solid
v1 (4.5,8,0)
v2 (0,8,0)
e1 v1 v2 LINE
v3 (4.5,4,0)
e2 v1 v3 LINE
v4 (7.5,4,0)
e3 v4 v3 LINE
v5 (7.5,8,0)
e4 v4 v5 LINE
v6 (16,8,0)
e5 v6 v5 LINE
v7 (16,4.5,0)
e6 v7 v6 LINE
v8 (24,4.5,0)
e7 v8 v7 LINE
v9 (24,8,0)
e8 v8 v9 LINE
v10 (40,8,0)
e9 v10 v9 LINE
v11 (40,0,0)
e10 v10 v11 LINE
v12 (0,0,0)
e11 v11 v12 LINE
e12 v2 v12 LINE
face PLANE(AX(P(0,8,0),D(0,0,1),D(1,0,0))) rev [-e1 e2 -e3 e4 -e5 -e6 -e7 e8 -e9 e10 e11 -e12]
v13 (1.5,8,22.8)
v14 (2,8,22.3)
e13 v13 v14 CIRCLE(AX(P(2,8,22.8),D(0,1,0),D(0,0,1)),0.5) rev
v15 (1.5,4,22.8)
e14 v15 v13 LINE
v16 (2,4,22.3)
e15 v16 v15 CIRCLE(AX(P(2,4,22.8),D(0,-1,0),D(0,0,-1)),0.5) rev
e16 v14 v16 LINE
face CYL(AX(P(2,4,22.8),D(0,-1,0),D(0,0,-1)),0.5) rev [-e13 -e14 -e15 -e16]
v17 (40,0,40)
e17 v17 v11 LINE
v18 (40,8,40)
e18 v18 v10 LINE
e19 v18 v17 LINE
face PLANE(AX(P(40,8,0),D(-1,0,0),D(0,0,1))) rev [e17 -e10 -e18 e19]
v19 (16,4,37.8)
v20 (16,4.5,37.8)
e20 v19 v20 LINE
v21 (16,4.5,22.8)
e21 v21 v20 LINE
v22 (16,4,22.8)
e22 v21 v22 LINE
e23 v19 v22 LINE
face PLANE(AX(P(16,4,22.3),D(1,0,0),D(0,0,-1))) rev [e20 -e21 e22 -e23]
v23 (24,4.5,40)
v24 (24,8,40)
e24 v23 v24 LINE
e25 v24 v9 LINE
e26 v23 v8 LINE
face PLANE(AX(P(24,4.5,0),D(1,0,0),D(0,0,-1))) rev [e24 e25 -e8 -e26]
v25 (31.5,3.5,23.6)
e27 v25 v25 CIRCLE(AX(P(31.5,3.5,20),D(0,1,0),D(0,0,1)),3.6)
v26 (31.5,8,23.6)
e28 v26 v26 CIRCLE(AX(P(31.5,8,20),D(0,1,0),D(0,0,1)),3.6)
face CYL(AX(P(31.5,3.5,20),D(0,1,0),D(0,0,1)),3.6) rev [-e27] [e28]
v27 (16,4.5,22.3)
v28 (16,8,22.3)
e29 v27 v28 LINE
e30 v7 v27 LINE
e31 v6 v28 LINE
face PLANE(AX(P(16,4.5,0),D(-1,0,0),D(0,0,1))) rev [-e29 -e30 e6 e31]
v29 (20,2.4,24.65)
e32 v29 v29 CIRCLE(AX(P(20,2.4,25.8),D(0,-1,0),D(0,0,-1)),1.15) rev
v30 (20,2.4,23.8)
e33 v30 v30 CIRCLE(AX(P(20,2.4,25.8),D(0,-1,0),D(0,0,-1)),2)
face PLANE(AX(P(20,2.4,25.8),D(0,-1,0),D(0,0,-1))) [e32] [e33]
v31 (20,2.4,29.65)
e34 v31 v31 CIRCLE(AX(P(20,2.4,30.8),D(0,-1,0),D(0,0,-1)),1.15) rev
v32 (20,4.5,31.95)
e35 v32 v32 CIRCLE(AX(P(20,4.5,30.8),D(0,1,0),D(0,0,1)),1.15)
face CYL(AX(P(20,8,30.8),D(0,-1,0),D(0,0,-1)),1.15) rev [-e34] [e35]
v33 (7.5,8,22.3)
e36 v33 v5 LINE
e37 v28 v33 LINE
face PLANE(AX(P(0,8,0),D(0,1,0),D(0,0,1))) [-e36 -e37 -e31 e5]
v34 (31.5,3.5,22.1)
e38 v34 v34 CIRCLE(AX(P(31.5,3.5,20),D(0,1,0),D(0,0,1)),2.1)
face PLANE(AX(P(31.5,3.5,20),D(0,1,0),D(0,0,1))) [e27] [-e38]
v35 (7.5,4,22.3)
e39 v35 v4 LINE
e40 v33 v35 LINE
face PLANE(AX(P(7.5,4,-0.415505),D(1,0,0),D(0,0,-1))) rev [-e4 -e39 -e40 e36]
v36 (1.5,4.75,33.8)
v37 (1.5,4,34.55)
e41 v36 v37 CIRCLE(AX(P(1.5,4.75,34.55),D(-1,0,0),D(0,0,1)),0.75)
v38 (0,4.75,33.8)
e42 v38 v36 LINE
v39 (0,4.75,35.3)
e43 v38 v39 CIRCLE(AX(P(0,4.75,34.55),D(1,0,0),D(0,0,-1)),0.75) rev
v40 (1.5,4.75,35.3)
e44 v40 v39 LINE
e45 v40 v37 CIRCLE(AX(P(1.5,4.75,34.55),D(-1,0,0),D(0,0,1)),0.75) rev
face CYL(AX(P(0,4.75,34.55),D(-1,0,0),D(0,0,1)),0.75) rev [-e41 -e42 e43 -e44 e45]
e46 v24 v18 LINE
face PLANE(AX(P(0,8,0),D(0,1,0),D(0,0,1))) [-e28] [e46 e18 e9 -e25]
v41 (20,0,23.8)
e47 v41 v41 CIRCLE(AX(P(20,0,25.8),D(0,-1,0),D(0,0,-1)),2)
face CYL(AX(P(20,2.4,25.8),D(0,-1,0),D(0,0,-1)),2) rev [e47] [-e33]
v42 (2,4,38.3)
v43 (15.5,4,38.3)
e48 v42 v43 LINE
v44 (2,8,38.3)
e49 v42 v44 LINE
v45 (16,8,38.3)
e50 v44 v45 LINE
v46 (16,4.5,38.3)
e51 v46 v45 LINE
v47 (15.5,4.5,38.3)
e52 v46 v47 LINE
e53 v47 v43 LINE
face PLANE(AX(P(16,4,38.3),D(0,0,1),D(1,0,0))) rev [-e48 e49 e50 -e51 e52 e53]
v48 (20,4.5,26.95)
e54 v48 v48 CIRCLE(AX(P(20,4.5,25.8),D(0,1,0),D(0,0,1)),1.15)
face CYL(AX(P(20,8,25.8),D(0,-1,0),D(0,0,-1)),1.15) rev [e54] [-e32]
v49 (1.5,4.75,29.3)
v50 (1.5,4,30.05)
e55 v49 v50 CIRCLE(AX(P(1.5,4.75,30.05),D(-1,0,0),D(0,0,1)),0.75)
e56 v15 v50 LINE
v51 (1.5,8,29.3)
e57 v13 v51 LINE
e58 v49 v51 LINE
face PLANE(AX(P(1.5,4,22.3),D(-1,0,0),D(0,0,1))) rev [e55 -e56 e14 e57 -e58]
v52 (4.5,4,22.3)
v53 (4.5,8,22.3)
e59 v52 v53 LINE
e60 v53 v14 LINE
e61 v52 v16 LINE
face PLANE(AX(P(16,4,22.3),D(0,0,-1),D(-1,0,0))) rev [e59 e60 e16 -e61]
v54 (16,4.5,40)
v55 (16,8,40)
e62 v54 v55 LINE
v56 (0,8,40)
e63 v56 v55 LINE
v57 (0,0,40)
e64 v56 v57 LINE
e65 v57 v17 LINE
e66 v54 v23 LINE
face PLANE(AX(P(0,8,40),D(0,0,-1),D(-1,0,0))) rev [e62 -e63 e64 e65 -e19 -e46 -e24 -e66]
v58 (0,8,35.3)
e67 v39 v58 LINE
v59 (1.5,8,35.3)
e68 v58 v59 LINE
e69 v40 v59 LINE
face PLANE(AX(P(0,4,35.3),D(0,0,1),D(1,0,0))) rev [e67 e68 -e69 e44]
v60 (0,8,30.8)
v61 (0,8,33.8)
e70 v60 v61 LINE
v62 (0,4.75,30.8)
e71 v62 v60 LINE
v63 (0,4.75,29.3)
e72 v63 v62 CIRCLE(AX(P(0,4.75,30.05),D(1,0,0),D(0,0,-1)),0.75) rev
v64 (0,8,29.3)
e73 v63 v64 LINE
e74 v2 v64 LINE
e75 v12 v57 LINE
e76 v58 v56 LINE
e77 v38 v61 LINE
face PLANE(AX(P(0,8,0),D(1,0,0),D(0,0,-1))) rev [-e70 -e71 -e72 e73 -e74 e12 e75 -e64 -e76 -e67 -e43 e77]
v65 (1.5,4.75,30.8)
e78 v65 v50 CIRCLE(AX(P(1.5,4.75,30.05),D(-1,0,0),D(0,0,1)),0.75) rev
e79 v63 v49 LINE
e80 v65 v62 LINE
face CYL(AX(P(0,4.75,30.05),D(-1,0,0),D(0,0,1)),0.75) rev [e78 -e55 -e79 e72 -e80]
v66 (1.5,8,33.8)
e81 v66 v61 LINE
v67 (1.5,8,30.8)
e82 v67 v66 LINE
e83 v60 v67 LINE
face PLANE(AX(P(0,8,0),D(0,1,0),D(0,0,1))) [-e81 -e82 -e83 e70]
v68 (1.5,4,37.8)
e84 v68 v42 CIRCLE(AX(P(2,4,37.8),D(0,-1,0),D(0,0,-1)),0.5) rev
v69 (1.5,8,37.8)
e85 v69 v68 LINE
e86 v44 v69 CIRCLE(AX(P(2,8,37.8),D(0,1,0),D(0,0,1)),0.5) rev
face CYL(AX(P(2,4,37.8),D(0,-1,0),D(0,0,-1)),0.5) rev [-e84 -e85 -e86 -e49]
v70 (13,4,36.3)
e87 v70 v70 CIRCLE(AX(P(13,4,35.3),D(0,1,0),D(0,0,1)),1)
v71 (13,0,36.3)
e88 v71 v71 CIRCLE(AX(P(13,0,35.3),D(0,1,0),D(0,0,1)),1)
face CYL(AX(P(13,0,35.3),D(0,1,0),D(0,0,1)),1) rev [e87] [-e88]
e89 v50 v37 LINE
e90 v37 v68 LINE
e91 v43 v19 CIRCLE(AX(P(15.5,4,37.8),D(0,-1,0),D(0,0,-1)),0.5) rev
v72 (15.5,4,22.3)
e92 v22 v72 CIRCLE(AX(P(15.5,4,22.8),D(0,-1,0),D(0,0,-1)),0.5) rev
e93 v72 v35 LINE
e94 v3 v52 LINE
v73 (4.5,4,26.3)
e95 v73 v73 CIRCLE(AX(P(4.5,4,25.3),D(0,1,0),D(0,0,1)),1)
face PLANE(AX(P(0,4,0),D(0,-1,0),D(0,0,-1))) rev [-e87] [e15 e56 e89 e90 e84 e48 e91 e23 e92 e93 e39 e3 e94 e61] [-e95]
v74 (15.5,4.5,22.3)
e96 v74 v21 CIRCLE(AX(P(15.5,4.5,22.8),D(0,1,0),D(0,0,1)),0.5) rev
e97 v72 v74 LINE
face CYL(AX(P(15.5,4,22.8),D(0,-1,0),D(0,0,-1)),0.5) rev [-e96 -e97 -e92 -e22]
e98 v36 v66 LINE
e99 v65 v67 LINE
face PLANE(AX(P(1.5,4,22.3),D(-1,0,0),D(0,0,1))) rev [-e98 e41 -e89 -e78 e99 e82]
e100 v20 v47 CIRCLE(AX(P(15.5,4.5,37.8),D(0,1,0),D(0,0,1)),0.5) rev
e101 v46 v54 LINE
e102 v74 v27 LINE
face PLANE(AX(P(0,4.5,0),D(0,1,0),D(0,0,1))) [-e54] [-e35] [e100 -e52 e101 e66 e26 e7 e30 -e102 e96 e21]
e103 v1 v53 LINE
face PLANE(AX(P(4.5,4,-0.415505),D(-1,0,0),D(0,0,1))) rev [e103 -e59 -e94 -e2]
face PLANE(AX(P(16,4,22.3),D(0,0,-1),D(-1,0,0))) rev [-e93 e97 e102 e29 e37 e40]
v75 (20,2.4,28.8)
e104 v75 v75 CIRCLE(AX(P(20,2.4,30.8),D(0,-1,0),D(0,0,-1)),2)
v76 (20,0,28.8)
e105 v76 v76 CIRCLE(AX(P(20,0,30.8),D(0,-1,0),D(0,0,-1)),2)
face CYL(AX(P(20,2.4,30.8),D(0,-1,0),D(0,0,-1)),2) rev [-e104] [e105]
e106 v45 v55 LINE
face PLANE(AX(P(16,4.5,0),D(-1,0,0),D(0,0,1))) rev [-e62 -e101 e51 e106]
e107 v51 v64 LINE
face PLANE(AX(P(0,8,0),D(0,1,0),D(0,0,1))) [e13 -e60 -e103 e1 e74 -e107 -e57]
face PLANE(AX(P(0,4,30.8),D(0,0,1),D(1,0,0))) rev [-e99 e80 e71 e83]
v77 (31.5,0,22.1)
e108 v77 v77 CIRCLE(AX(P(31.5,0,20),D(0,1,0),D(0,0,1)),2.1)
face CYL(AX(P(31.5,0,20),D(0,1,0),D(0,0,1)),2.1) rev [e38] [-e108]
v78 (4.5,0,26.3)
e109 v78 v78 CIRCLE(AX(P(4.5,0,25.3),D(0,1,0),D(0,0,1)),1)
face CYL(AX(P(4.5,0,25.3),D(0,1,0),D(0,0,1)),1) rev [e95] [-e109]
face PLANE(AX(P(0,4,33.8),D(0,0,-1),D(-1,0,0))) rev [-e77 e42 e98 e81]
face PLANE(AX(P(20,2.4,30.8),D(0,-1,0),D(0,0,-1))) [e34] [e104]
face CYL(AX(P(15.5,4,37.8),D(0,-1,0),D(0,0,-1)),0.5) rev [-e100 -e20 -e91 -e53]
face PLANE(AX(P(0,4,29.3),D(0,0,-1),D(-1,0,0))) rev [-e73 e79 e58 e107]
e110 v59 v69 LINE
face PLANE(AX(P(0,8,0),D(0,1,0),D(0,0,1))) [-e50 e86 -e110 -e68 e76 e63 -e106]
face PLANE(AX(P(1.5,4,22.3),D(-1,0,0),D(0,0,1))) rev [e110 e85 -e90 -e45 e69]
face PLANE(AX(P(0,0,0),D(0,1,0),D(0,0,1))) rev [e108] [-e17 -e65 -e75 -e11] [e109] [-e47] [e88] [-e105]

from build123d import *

# Parameters (mm, degrees)
SKETCH_1_W           = 40
SKETCH_1_H           = 40
EXTRUDE_1_DEPTH      = 8
SKETCH_2_W           = 8
SKETCH_2_H           = 40
CUT_EXTRUDE_1_DEPTH  = 3.5
SKETCH_3_R           = 1.15
CUT_EXTRUDE_2_DEPTH  = 58.131427428
SKETCH_4_R           = 2
CUT_EXTRUDE_3_DEPTH  = 2.4
SKETCH_5_W           = 14.5
SKETCH_5_H           = 16
CUT_EXTRUDE_4_DEPTH  = 4
FILLET_2_R           = 0.5
SKETCH_6_W           = 1.5
SKETCH_6_H           = 1.5
CUT_EXTRUDE_5_DEPTH  = 4
SKETCH_7_R           = 1
CUT_EXTRUDE_6_DEPTH  = 4
FILLET_3_R           = 0.75
FILLET_4_R           = 0.75
CUT_EXTRUDE_7_DEPTH  = 4
SKETCH_10_R          = 3.6
CUT_EXTRUDE_9_DEPTH  = 4.5
SKETCH_11_R          = 2.1
CUT_EXTRUDE_10_DEPTH = 57.747246629


with BuildPart() as part:
    # 草图1 → 凸台-拉伸1 (new body)
    with BuildSketch(Plane(origin=(0, 0, 0), x_dir=(1, 0, 0), z_dir=(0, 1, 0))):
        with Locations((20, -20)):
            Rectangle(SKETCH_1_W, SKETCH_1_H)
    extrude(amount=EXTRUDE_1_DEPTH)

    # 草图2 → 切除-拉伸1 (cut)
    with BuildSketch(Plane(origin=(0, 8, 0), x_dir=(1, 0, 0), z_dir=(0, 1, 0))):
        with Locations((20, -20)):
            Rectangle(SKETCH_2_W, SKETCH_2_H)
    extrude(amount=-CUT_EXTRUDE_1_DEPTH, mode=Mode.SUBTRACT)

    # 草图3 → 切除-拉伸2 (cut, through all)
    with BuildSketch(Plane(origin=(0, 0, 0), x_dir=(-1, 0, 0), z_dir=(0, -1, 0))):
        with Locations(Location((-20, -30.8, 0), (0, 0, 90))):
            Circle(SKETCH_3_R)
        with Locations(Location((-20, -25.8, 0), (0, 0, 90))):
            Circle(SKETCH_3_R)
    extrude(amount=-CUT_EXTRUDE_2_DEPTH, mode=Mode.SUBTRACT)

    # 草图4 → 切除-拉伸3 (cut)
    with BuildSketch(Plane(origin=(0, 0, 0), x_dir=(-1, 0, 0), z_dir=(0, -1, 0))):
        with Locations(Location((-20, -30.8, 0), (0, 0, 90))):
            Circle(SKETCH_4_R)
        with Locations(Location((-20, -25.8, 0), (0, 0, 90))):
            Circle(SKETCH_4_R)
    extrude(amount=-CUT_EXTRUDE_3_DEPTH, mode=Mode.SUBTRACT)

    # 草图5 → 切除-拉伸4 (cut)
    with BuildSketch(Plane(origin=(0, 8, 0), x_dir=(1, 0, 0), z_dir=(0, 1, 0))):
        with Locations((8.75, -30.3)):
            Rectangle(SKETCH_5_W, SKETCH_5_H)
    extrude(amount=-CUT_EXTRUDE_4_DEPTH, mode=Mode.SUBTRACT)

    # 圆角2
    fillet_2_edges = [part.edges().sort_by_distance(p)[0] for p in [
        (16, 4.25, 22.3),
        (16, 4.25, 38.3),
        (1.5, 6, 38.3),
        (1.5, 6, 22.3),
    ]]
    fillet(fillet_2_edges, radius=FILLET_2_R)

    # 草图6 → 切除-拉伸5 (cut)
    with BuildSketch(Plane(origin=(0, 8, 0), x_dir=(1, 0, 0), z_dir=(0, 1, 0))):
        with Locations((0.75, -34.55)):
            Rectangle(SKETCH_6_W, SKETCH_6_H)
        with Locations((0.75, -30.05)):
            Rectangle(SKETCH_6_W, SKETCH_6_H)
    extrude(amount=-CUT_EXTRUDE_5_DEPTH, mode=Mode.SUBTRACT)

    # 草图7 → 切除-拉伸6 (cut)
    with BuildSketch(Plane(origin=(0, 4, 0), x_dir=(1, 0, 0), z_dir=(0, 1, 0))):
        with Locations(Location((4.5, -25.3, 0), (0, 0, 270))):
            Circle(SKETCH_7_R)
        with Locations(Location((13, -35.3, 0), (0, 0, 270))):
            Circle(SKETCH_7_R)
    extrude(amount=-CUT_EXTRUDE_6_DEPTH, mode=Mode.SUBTRACT)

    # 圆角3
    # the kernel refuses this fillet: 0.75 mm, written as the material it adds along each edge
    with BuildSketch(Plane(origin=(0, 4, 29.3), x_dir=(0, 0, 1), z_dir=(1, 0, 0)), Plane(origin=(1.5, 4, 30.8), x_dir=(0, 0, -1), z_dir=(-1, 0, 0))) as fillet_3_piece_1:
        with BuildLine():
            CenterArc((FILLET_3_R, -FILLET_3_R), FILLET_3_R, 90, 90)
            Line((0, -FILLET_3_R), (0, 0))
            Line((0, 0), (FILLET_3_R, 0))
        make_face()
    extrude(amount=1.5)

    # 圆角4
    # the kernel refuses this fillet: 0.75 mm, written as the material it adds along each edge
    with BuildSketch(Plane(origin=(0, 4, 33.8), x_dir=(0, 0, 1), z_dir=(1, 0, 0)), Plane(origin=(1.5, 4, 35.3), x_dir=(0, 0, -1), z_dir=(-1, 0, 0))) as fillet_4_piece_1:
        with BuildLine():
            CenterArc((FILLET_4_R, -FILLET_4_R), FILLET_4_R, 90, 90)
            Line((0, -FILLET_4_R), (0, 0))
            Line((0, 0), (FILLET_4_R, 0))
        make_face()
    extrude(amount=1.5)

    # 草图8 → 切除-拉伸7 (cut)
    with BuildSketch(Plane(origin=(0, 8, 0), x_dir=(1, 0, 0), z_dir=(0, 1, 0))):
        with BuildLine():
            Line((7.5, 0.415504674), (7.5, -29.155940237))
            ThreePointArc((7.5, -29.155940237), (6, -30.655940237), (4.5, -29.155940237))
            Line((4.5, -29.155940237), (4.5, 0.415504674))
            ThreePointArc((4.5, 0.415504674), (6, 1.915504674), (7.5, 0.415504674))
        make_face()
    extrude(amount=-CUT_EXTRUDE_7_DEPTH, mode=Mode.SUBTRACT)

    # 草图10 → 切除-拉伸9 (cut)
    with BuildSketch(Plane(origin=(0, 8, 0), x_dir=(1, 0, 0), z_dir=(0, 1, 0))):
        with Locations(Location((31.5, -20, 0), (0, 0, 270))):
            Circle(SKETCH_10_R)
    extrude(amount=-CUT_EXTRUDE_9_DEPTH, mode=Mode.SUBTRACT)

    # 草图11 → 切除-拉伸10 (cut, through all)
    with BuildSketch(Plane(origin=(0, 3.5, 0), x_dir=(1, 0, 0), z_dir=(0, 1, 0))):
        with Locations(Location((31.5, -20, 0), (0, 0, 270))):
            Circle(SKETCH_11_R)
    extrude(amount=-CUT_EXTRUDE_10_DEPTH, mode=Mode.SUBTRACT)


solid = part.part
